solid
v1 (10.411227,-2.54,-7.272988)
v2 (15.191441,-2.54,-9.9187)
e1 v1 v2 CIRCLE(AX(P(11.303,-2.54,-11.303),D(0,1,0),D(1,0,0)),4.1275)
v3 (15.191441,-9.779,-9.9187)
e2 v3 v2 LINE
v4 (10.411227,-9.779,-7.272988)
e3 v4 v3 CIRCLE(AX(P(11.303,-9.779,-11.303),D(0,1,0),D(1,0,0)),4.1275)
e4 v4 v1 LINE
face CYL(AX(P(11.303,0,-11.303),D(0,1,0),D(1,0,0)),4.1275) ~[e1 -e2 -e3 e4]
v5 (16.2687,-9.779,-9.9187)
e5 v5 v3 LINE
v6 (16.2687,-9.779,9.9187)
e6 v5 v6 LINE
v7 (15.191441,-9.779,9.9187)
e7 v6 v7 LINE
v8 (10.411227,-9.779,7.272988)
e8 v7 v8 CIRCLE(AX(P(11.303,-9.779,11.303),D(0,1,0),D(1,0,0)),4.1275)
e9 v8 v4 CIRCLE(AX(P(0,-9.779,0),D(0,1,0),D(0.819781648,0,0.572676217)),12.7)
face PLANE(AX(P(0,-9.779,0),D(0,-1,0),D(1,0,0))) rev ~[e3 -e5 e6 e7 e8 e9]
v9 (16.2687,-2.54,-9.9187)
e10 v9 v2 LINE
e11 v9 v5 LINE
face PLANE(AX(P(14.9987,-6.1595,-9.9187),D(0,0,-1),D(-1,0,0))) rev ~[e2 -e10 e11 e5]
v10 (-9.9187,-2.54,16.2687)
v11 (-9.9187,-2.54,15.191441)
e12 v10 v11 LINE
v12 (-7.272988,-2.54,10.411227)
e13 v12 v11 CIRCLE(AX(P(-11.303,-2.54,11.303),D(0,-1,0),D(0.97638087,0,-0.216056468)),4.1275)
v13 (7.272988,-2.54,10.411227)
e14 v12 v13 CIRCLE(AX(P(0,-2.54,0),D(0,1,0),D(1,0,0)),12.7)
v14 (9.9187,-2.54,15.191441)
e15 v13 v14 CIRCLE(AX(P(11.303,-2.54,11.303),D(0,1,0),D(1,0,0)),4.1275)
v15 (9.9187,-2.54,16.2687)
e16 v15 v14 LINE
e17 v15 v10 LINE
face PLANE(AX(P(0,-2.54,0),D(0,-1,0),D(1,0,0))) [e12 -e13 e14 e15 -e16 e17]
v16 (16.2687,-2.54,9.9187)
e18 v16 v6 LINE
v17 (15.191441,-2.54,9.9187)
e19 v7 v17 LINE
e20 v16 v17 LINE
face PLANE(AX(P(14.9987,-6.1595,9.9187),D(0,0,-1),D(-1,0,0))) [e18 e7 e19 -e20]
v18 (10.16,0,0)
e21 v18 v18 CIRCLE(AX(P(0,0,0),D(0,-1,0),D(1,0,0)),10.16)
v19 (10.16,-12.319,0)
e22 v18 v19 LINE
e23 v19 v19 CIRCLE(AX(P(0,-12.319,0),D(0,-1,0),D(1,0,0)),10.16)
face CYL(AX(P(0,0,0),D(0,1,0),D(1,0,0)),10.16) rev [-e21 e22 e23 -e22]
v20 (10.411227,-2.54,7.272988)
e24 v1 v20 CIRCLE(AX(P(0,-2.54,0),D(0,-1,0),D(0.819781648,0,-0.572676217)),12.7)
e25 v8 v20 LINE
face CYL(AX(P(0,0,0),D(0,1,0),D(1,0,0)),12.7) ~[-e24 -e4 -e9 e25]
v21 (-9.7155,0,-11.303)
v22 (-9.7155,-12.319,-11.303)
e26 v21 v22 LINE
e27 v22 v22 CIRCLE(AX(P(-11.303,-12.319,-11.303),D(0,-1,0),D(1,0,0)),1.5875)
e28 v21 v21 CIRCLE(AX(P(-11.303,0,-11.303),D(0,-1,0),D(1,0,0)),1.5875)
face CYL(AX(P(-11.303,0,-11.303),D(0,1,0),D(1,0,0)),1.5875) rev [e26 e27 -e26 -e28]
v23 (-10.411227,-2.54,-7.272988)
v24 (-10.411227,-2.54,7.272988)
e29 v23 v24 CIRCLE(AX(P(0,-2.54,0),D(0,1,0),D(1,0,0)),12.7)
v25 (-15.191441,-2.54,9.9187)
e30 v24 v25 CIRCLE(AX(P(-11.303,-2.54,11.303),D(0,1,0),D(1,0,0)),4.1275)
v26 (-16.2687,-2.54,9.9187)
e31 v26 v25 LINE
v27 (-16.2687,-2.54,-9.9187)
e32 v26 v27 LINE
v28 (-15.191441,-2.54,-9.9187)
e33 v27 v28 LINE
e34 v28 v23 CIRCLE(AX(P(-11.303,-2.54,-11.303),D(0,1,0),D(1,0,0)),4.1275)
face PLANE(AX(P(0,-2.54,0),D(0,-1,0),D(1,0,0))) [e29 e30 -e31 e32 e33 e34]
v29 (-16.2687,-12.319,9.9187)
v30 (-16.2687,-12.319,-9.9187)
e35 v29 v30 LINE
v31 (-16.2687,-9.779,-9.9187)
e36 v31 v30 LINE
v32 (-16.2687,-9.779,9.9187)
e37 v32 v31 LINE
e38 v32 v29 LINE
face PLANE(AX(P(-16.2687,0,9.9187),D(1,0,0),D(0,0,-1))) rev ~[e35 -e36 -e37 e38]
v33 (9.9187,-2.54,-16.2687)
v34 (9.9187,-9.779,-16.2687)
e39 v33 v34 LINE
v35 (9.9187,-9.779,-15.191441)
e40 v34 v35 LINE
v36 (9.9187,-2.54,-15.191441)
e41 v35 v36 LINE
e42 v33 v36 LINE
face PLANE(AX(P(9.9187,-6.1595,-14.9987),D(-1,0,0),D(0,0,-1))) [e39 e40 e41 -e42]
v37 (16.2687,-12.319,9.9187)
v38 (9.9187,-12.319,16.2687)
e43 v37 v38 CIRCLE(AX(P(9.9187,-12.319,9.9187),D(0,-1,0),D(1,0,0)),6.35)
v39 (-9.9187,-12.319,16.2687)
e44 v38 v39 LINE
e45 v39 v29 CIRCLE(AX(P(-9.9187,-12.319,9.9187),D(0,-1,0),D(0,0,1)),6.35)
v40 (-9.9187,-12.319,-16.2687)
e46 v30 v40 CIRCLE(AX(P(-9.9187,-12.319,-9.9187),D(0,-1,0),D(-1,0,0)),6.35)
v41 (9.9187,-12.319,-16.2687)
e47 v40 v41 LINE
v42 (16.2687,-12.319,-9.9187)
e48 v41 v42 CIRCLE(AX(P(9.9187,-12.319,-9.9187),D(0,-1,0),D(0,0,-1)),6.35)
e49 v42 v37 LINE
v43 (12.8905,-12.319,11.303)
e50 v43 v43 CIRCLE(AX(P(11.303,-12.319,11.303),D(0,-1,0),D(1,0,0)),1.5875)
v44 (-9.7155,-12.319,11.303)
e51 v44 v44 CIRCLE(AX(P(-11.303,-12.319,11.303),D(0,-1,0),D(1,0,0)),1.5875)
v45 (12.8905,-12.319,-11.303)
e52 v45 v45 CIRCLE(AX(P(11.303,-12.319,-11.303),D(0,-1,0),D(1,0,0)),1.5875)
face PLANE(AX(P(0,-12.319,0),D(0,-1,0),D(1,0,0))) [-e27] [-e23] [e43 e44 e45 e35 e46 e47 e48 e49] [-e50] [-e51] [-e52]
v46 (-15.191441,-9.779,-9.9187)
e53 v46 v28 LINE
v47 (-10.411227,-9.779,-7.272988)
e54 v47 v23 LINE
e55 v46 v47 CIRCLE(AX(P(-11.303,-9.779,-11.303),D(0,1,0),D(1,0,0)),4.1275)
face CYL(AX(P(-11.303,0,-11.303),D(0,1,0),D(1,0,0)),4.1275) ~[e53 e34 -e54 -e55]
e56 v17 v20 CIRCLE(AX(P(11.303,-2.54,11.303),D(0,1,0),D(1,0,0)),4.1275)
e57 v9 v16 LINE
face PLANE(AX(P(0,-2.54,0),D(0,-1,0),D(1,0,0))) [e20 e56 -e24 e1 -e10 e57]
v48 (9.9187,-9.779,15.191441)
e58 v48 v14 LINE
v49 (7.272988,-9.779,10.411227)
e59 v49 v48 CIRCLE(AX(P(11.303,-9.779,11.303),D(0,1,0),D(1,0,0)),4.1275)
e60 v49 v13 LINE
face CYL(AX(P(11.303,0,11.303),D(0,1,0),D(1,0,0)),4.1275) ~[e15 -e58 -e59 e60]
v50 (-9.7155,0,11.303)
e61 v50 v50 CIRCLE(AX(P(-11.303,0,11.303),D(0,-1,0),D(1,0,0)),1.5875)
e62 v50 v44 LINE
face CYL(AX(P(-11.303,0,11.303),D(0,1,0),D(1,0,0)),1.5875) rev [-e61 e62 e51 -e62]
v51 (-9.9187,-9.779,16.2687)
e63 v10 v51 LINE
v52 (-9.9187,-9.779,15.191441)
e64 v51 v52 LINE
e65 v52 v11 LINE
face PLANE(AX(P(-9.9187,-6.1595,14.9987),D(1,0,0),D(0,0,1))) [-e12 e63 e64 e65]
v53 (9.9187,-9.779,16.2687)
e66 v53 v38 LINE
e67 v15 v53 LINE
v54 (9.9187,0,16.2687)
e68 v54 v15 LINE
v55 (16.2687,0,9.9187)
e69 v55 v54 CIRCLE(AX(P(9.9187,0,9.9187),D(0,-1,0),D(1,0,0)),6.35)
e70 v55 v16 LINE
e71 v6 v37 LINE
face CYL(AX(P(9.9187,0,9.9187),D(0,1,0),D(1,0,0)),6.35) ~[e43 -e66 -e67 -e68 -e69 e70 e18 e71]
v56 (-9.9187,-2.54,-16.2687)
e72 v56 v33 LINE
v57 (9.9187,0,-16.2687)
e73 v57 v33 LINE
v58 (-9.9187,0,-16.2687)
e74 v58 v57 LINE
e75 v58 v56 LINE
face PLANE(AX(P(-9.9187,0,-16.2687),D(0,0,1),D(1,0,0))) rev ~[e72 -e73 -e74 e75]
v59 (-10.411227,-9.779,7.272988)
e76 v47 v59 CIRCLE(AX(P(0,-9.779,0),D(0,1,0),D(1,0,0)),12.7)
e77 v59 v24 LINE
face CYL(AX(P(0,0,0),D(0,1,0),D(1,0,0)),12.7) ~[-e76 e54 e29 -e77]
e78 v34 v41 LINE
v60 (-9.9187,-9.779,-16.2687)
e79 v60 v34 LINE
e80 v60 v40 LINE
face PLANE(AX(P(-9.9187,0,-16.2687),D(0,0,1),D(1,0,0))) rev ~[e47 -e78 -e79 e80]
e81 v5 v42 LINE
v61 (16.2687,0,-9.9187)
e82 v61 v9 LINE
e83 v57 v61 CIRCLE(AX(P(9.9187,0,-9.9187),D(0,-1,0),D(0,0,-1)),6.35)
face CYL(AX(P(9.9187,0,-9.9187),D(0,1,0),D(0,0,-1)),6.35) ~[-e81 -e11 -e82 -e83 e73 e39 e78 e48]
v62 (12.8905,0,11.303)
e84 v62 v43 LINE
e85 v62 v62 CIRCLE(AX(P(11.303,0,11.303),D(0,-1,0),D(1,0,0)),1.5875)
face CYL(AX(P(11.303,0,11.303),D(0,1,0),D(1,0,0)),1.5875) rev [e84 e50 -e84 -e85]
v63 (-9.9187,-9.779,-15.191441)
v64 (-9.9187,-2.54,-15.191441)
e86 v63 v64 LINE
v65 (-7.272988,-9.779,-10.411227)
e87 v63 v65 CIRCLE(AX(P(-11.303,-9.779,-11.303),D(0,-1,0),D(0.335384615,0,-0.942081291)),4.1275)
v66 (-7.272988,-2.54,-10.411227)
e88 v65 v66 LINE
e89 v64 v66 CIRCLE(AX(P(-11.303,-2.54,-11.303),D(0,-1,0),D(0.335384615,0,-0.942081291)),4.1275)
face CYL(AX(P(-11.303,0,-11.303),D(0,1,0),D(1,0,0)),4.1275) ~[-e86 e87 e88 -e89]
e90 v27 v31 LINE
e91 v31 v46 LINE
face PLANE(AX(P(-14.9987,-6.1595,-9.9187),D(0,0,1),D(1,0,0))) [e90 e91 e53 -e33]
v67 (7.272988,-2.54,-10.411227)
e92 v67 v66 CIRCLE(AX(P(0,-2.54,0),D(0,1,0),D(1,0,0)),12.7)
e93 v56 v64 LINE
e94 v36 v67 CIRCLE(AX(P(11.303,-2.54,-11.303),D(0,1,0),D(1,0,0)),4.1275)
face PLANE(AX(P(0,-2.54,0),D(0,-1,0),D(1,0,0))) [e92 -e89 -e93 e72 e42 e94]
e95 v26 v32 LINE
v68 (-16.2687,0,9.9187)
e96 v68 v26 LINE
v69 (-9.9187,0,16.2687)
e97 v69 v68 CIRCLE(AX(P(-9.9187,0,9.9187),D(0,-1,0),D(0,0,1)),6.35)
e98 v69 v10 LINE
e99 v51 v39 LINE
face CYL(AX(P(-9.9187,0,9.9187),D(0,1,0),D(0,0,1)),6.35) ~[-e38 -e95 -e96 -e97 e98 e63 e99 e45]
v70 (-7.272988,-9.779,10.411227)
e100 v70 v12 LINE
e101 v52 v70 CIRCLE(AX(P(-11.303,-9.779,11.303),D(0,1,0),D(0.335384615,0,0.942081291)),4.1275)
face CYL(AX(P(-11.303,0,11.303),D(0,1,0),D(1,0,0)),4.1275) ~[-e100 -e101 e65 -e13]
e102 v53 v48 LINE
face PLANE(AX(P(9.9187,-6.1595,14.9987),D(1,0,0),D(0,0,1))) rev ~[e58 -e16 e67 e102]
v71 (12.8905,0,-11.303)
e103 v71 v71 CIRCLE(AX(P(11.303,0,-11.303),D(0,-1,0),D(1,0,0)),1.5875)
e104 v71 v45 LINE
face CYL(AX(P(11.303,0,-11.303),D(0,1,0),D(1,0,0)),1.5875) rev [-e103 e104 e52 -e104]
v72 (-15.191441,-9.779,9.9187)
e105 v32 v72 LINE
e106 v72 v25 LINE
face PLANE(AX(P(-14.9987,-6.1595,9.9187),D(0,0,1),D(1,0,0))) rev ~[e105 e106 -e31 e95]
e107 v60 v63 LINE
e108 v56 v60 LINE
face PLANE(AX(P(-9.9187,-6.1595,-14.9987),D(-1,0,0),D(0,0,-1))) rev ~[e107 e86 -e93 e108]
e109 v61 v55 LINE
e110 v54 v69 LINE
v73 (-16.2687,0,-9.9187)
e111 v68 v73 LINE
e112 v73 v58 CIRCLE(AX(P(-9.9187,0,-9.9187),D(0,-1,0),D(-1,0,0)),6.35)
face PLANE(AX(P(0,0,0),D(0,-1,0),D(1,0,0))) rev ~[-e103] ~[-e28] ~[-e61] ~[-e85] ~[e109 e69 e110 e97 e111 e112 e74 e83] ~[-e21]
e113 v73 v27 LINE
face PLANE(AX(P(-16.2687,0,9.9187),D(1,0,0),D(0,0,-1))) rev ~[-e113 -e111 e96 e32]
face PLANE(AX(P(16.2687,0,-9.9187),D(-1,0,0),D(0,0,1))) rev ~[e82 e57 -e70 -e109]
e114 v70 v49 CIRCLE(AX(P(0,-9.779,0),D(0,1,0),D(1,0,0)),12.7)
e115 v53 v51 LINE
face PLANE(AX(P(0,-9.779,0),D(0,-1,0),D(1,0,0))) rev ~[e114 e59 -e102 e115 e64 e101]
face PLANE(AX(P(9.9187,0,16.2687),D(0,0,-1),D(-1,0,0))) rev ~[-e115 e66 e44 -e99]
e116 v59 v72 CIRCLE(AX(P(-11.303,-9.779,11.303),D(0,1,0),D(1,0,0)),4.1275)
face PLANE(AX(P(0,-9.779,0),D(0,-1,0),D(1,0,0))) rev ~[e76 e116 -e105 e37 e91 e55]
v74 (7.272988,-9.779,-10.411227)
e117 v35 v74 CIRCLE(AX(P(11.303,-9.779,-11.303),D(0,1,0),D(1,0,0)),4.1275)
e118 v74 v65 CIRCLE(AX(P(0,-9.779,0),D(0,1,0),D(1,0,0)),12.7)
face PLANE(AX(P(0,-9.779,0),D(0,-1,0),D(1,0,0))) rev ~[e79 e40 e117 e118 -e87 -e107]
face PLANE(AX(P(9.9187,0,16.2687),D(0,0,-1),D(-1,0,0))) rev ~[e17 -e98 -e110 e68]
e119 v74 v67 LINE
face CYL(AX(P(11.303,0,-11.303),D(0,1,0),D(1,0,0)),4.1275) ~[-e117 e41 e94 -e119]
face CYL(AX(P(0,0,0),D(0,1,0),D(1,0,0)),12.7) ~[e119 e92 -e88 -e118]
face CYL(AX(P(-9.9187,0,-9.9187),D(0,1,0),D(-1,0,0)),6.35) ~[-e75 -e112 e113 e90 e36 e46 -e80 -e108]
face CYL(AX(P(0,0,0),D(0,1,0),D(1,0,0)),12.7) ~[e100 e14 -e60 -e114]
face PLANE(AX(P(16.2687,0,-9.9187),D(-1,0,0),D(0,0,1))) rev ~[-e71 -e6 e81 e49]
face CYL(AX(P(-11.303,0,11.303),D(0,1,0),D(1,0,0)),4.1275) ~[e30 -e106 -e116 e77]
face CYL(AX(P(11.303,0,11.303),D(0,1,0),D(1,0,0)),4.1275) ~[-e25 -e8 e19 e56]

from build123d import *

# Parameters (mm, degrees)
F0_R     = 1.5875
F0_R_2   = 10.16
F1_DEPTH = 12.319
F2_T     = 2.54


# Not quite as in the source:
# - a shell that OpenCascade refuses in one call is made with other operations: the cavity is built on its own and cut out


with BuildPart() as f1:
    # F0 (on Front) → F1 (new body)
    with BuildSketch(Plane.XZ):
        with BuildLine():
            Line((9.9187, 16.2687), (-9.9187, 16.2687))
            ThreePointArc((-9.9187, 16.2687), (-14.4088280605, 14.4088280605), (-16.2687, 9.9187))
            Line((-16.2687, 9.9187), (-16.2687, -9.9187))
            ThreePointArc((-16.2687, -9.9187), (-14.4088280605, -14.4088280605), (-9.9187, -16.2687))
            Line((-9.9187, -16.2687), (9.9187, -16.2687))
            ThreePointArc((9.9187, -16.2687), (14.4088280605, -14.4088280605), (16.2687, -9.9187))
            Line((16.2687, -9.9187), (16.2687, 9.9187))
            ThreePointArc((16.2687, 9.9187), (14.4088280605, 14.4088280605), (9.9187, 16.2687))
        make_face()
        with Locations((-11.303, -11.303)):
            Circle(F0_R, mode=Mode.SUBTRACT)
        with Locations((11.303, -11.303)):
            Circle(F0_R, mode=Mode.SUBTRACT)
        Circle(F0_R_2, mode=Mode.SUBTRACT)
        with Locations((-11.303, 11.303)):
            Circle(F0_R, mode=Mode.SUBTRACT)
        with Locations((11.303, 11.303)):
            Circle(F0_R, mode=Mode.SUBTRACT)
    extrude(amount=F1_DEPTH)

    # F2: shell of thickness 2.54, made by hand


with BuildPart() as f2_core1:
    # F2_t2: copy of F1
    add(f1.part)

    # the walls: a layer under each face that stays
    f2_faces = [f2_core1.faces().sort_by_distance(p)[0] for p in [
        (14.4088280605, -6.1595, 14.4088280605),
        (-14.4088280605, -6.1595, 14.4088280605),
        (-14.4088280605, -6.1595, -14.4088280605),
        (14.4088280605, -6.1595, -14.4088280605),
        (-12.8905, -6.1595, -11.303),
        (9.7155, -6.1595, -11.303),
        (-10.16, -6.1595, 0),
        (-12.8905, -6.1595, 11.303),
        (9.7155, -6.1595, 11.303),
        (-10.8458, 0, 0),
        (-10.8458, -12.319, 0),
    ]]
    thicken(f2_faces, amount=-F2_T, mode=Mode.SUBTRACT)


with BuildPart() as f1_1:
    add(f1.part)

    # what is left inside the walls is the cavity
    f2_cavity = [f2_core1.part.solids().sort_by_distance(p)[0] for p in [
        (16.2433, -7.366, 0),
        (0, -7.366, 16.2433),
        (0, -7.366, -16.2433),
        (-16.2433, -7.366, 0),
    ]]
    add(f2_cavity, mode=Mode.SUBTRACT)


solid = f1_1.part
